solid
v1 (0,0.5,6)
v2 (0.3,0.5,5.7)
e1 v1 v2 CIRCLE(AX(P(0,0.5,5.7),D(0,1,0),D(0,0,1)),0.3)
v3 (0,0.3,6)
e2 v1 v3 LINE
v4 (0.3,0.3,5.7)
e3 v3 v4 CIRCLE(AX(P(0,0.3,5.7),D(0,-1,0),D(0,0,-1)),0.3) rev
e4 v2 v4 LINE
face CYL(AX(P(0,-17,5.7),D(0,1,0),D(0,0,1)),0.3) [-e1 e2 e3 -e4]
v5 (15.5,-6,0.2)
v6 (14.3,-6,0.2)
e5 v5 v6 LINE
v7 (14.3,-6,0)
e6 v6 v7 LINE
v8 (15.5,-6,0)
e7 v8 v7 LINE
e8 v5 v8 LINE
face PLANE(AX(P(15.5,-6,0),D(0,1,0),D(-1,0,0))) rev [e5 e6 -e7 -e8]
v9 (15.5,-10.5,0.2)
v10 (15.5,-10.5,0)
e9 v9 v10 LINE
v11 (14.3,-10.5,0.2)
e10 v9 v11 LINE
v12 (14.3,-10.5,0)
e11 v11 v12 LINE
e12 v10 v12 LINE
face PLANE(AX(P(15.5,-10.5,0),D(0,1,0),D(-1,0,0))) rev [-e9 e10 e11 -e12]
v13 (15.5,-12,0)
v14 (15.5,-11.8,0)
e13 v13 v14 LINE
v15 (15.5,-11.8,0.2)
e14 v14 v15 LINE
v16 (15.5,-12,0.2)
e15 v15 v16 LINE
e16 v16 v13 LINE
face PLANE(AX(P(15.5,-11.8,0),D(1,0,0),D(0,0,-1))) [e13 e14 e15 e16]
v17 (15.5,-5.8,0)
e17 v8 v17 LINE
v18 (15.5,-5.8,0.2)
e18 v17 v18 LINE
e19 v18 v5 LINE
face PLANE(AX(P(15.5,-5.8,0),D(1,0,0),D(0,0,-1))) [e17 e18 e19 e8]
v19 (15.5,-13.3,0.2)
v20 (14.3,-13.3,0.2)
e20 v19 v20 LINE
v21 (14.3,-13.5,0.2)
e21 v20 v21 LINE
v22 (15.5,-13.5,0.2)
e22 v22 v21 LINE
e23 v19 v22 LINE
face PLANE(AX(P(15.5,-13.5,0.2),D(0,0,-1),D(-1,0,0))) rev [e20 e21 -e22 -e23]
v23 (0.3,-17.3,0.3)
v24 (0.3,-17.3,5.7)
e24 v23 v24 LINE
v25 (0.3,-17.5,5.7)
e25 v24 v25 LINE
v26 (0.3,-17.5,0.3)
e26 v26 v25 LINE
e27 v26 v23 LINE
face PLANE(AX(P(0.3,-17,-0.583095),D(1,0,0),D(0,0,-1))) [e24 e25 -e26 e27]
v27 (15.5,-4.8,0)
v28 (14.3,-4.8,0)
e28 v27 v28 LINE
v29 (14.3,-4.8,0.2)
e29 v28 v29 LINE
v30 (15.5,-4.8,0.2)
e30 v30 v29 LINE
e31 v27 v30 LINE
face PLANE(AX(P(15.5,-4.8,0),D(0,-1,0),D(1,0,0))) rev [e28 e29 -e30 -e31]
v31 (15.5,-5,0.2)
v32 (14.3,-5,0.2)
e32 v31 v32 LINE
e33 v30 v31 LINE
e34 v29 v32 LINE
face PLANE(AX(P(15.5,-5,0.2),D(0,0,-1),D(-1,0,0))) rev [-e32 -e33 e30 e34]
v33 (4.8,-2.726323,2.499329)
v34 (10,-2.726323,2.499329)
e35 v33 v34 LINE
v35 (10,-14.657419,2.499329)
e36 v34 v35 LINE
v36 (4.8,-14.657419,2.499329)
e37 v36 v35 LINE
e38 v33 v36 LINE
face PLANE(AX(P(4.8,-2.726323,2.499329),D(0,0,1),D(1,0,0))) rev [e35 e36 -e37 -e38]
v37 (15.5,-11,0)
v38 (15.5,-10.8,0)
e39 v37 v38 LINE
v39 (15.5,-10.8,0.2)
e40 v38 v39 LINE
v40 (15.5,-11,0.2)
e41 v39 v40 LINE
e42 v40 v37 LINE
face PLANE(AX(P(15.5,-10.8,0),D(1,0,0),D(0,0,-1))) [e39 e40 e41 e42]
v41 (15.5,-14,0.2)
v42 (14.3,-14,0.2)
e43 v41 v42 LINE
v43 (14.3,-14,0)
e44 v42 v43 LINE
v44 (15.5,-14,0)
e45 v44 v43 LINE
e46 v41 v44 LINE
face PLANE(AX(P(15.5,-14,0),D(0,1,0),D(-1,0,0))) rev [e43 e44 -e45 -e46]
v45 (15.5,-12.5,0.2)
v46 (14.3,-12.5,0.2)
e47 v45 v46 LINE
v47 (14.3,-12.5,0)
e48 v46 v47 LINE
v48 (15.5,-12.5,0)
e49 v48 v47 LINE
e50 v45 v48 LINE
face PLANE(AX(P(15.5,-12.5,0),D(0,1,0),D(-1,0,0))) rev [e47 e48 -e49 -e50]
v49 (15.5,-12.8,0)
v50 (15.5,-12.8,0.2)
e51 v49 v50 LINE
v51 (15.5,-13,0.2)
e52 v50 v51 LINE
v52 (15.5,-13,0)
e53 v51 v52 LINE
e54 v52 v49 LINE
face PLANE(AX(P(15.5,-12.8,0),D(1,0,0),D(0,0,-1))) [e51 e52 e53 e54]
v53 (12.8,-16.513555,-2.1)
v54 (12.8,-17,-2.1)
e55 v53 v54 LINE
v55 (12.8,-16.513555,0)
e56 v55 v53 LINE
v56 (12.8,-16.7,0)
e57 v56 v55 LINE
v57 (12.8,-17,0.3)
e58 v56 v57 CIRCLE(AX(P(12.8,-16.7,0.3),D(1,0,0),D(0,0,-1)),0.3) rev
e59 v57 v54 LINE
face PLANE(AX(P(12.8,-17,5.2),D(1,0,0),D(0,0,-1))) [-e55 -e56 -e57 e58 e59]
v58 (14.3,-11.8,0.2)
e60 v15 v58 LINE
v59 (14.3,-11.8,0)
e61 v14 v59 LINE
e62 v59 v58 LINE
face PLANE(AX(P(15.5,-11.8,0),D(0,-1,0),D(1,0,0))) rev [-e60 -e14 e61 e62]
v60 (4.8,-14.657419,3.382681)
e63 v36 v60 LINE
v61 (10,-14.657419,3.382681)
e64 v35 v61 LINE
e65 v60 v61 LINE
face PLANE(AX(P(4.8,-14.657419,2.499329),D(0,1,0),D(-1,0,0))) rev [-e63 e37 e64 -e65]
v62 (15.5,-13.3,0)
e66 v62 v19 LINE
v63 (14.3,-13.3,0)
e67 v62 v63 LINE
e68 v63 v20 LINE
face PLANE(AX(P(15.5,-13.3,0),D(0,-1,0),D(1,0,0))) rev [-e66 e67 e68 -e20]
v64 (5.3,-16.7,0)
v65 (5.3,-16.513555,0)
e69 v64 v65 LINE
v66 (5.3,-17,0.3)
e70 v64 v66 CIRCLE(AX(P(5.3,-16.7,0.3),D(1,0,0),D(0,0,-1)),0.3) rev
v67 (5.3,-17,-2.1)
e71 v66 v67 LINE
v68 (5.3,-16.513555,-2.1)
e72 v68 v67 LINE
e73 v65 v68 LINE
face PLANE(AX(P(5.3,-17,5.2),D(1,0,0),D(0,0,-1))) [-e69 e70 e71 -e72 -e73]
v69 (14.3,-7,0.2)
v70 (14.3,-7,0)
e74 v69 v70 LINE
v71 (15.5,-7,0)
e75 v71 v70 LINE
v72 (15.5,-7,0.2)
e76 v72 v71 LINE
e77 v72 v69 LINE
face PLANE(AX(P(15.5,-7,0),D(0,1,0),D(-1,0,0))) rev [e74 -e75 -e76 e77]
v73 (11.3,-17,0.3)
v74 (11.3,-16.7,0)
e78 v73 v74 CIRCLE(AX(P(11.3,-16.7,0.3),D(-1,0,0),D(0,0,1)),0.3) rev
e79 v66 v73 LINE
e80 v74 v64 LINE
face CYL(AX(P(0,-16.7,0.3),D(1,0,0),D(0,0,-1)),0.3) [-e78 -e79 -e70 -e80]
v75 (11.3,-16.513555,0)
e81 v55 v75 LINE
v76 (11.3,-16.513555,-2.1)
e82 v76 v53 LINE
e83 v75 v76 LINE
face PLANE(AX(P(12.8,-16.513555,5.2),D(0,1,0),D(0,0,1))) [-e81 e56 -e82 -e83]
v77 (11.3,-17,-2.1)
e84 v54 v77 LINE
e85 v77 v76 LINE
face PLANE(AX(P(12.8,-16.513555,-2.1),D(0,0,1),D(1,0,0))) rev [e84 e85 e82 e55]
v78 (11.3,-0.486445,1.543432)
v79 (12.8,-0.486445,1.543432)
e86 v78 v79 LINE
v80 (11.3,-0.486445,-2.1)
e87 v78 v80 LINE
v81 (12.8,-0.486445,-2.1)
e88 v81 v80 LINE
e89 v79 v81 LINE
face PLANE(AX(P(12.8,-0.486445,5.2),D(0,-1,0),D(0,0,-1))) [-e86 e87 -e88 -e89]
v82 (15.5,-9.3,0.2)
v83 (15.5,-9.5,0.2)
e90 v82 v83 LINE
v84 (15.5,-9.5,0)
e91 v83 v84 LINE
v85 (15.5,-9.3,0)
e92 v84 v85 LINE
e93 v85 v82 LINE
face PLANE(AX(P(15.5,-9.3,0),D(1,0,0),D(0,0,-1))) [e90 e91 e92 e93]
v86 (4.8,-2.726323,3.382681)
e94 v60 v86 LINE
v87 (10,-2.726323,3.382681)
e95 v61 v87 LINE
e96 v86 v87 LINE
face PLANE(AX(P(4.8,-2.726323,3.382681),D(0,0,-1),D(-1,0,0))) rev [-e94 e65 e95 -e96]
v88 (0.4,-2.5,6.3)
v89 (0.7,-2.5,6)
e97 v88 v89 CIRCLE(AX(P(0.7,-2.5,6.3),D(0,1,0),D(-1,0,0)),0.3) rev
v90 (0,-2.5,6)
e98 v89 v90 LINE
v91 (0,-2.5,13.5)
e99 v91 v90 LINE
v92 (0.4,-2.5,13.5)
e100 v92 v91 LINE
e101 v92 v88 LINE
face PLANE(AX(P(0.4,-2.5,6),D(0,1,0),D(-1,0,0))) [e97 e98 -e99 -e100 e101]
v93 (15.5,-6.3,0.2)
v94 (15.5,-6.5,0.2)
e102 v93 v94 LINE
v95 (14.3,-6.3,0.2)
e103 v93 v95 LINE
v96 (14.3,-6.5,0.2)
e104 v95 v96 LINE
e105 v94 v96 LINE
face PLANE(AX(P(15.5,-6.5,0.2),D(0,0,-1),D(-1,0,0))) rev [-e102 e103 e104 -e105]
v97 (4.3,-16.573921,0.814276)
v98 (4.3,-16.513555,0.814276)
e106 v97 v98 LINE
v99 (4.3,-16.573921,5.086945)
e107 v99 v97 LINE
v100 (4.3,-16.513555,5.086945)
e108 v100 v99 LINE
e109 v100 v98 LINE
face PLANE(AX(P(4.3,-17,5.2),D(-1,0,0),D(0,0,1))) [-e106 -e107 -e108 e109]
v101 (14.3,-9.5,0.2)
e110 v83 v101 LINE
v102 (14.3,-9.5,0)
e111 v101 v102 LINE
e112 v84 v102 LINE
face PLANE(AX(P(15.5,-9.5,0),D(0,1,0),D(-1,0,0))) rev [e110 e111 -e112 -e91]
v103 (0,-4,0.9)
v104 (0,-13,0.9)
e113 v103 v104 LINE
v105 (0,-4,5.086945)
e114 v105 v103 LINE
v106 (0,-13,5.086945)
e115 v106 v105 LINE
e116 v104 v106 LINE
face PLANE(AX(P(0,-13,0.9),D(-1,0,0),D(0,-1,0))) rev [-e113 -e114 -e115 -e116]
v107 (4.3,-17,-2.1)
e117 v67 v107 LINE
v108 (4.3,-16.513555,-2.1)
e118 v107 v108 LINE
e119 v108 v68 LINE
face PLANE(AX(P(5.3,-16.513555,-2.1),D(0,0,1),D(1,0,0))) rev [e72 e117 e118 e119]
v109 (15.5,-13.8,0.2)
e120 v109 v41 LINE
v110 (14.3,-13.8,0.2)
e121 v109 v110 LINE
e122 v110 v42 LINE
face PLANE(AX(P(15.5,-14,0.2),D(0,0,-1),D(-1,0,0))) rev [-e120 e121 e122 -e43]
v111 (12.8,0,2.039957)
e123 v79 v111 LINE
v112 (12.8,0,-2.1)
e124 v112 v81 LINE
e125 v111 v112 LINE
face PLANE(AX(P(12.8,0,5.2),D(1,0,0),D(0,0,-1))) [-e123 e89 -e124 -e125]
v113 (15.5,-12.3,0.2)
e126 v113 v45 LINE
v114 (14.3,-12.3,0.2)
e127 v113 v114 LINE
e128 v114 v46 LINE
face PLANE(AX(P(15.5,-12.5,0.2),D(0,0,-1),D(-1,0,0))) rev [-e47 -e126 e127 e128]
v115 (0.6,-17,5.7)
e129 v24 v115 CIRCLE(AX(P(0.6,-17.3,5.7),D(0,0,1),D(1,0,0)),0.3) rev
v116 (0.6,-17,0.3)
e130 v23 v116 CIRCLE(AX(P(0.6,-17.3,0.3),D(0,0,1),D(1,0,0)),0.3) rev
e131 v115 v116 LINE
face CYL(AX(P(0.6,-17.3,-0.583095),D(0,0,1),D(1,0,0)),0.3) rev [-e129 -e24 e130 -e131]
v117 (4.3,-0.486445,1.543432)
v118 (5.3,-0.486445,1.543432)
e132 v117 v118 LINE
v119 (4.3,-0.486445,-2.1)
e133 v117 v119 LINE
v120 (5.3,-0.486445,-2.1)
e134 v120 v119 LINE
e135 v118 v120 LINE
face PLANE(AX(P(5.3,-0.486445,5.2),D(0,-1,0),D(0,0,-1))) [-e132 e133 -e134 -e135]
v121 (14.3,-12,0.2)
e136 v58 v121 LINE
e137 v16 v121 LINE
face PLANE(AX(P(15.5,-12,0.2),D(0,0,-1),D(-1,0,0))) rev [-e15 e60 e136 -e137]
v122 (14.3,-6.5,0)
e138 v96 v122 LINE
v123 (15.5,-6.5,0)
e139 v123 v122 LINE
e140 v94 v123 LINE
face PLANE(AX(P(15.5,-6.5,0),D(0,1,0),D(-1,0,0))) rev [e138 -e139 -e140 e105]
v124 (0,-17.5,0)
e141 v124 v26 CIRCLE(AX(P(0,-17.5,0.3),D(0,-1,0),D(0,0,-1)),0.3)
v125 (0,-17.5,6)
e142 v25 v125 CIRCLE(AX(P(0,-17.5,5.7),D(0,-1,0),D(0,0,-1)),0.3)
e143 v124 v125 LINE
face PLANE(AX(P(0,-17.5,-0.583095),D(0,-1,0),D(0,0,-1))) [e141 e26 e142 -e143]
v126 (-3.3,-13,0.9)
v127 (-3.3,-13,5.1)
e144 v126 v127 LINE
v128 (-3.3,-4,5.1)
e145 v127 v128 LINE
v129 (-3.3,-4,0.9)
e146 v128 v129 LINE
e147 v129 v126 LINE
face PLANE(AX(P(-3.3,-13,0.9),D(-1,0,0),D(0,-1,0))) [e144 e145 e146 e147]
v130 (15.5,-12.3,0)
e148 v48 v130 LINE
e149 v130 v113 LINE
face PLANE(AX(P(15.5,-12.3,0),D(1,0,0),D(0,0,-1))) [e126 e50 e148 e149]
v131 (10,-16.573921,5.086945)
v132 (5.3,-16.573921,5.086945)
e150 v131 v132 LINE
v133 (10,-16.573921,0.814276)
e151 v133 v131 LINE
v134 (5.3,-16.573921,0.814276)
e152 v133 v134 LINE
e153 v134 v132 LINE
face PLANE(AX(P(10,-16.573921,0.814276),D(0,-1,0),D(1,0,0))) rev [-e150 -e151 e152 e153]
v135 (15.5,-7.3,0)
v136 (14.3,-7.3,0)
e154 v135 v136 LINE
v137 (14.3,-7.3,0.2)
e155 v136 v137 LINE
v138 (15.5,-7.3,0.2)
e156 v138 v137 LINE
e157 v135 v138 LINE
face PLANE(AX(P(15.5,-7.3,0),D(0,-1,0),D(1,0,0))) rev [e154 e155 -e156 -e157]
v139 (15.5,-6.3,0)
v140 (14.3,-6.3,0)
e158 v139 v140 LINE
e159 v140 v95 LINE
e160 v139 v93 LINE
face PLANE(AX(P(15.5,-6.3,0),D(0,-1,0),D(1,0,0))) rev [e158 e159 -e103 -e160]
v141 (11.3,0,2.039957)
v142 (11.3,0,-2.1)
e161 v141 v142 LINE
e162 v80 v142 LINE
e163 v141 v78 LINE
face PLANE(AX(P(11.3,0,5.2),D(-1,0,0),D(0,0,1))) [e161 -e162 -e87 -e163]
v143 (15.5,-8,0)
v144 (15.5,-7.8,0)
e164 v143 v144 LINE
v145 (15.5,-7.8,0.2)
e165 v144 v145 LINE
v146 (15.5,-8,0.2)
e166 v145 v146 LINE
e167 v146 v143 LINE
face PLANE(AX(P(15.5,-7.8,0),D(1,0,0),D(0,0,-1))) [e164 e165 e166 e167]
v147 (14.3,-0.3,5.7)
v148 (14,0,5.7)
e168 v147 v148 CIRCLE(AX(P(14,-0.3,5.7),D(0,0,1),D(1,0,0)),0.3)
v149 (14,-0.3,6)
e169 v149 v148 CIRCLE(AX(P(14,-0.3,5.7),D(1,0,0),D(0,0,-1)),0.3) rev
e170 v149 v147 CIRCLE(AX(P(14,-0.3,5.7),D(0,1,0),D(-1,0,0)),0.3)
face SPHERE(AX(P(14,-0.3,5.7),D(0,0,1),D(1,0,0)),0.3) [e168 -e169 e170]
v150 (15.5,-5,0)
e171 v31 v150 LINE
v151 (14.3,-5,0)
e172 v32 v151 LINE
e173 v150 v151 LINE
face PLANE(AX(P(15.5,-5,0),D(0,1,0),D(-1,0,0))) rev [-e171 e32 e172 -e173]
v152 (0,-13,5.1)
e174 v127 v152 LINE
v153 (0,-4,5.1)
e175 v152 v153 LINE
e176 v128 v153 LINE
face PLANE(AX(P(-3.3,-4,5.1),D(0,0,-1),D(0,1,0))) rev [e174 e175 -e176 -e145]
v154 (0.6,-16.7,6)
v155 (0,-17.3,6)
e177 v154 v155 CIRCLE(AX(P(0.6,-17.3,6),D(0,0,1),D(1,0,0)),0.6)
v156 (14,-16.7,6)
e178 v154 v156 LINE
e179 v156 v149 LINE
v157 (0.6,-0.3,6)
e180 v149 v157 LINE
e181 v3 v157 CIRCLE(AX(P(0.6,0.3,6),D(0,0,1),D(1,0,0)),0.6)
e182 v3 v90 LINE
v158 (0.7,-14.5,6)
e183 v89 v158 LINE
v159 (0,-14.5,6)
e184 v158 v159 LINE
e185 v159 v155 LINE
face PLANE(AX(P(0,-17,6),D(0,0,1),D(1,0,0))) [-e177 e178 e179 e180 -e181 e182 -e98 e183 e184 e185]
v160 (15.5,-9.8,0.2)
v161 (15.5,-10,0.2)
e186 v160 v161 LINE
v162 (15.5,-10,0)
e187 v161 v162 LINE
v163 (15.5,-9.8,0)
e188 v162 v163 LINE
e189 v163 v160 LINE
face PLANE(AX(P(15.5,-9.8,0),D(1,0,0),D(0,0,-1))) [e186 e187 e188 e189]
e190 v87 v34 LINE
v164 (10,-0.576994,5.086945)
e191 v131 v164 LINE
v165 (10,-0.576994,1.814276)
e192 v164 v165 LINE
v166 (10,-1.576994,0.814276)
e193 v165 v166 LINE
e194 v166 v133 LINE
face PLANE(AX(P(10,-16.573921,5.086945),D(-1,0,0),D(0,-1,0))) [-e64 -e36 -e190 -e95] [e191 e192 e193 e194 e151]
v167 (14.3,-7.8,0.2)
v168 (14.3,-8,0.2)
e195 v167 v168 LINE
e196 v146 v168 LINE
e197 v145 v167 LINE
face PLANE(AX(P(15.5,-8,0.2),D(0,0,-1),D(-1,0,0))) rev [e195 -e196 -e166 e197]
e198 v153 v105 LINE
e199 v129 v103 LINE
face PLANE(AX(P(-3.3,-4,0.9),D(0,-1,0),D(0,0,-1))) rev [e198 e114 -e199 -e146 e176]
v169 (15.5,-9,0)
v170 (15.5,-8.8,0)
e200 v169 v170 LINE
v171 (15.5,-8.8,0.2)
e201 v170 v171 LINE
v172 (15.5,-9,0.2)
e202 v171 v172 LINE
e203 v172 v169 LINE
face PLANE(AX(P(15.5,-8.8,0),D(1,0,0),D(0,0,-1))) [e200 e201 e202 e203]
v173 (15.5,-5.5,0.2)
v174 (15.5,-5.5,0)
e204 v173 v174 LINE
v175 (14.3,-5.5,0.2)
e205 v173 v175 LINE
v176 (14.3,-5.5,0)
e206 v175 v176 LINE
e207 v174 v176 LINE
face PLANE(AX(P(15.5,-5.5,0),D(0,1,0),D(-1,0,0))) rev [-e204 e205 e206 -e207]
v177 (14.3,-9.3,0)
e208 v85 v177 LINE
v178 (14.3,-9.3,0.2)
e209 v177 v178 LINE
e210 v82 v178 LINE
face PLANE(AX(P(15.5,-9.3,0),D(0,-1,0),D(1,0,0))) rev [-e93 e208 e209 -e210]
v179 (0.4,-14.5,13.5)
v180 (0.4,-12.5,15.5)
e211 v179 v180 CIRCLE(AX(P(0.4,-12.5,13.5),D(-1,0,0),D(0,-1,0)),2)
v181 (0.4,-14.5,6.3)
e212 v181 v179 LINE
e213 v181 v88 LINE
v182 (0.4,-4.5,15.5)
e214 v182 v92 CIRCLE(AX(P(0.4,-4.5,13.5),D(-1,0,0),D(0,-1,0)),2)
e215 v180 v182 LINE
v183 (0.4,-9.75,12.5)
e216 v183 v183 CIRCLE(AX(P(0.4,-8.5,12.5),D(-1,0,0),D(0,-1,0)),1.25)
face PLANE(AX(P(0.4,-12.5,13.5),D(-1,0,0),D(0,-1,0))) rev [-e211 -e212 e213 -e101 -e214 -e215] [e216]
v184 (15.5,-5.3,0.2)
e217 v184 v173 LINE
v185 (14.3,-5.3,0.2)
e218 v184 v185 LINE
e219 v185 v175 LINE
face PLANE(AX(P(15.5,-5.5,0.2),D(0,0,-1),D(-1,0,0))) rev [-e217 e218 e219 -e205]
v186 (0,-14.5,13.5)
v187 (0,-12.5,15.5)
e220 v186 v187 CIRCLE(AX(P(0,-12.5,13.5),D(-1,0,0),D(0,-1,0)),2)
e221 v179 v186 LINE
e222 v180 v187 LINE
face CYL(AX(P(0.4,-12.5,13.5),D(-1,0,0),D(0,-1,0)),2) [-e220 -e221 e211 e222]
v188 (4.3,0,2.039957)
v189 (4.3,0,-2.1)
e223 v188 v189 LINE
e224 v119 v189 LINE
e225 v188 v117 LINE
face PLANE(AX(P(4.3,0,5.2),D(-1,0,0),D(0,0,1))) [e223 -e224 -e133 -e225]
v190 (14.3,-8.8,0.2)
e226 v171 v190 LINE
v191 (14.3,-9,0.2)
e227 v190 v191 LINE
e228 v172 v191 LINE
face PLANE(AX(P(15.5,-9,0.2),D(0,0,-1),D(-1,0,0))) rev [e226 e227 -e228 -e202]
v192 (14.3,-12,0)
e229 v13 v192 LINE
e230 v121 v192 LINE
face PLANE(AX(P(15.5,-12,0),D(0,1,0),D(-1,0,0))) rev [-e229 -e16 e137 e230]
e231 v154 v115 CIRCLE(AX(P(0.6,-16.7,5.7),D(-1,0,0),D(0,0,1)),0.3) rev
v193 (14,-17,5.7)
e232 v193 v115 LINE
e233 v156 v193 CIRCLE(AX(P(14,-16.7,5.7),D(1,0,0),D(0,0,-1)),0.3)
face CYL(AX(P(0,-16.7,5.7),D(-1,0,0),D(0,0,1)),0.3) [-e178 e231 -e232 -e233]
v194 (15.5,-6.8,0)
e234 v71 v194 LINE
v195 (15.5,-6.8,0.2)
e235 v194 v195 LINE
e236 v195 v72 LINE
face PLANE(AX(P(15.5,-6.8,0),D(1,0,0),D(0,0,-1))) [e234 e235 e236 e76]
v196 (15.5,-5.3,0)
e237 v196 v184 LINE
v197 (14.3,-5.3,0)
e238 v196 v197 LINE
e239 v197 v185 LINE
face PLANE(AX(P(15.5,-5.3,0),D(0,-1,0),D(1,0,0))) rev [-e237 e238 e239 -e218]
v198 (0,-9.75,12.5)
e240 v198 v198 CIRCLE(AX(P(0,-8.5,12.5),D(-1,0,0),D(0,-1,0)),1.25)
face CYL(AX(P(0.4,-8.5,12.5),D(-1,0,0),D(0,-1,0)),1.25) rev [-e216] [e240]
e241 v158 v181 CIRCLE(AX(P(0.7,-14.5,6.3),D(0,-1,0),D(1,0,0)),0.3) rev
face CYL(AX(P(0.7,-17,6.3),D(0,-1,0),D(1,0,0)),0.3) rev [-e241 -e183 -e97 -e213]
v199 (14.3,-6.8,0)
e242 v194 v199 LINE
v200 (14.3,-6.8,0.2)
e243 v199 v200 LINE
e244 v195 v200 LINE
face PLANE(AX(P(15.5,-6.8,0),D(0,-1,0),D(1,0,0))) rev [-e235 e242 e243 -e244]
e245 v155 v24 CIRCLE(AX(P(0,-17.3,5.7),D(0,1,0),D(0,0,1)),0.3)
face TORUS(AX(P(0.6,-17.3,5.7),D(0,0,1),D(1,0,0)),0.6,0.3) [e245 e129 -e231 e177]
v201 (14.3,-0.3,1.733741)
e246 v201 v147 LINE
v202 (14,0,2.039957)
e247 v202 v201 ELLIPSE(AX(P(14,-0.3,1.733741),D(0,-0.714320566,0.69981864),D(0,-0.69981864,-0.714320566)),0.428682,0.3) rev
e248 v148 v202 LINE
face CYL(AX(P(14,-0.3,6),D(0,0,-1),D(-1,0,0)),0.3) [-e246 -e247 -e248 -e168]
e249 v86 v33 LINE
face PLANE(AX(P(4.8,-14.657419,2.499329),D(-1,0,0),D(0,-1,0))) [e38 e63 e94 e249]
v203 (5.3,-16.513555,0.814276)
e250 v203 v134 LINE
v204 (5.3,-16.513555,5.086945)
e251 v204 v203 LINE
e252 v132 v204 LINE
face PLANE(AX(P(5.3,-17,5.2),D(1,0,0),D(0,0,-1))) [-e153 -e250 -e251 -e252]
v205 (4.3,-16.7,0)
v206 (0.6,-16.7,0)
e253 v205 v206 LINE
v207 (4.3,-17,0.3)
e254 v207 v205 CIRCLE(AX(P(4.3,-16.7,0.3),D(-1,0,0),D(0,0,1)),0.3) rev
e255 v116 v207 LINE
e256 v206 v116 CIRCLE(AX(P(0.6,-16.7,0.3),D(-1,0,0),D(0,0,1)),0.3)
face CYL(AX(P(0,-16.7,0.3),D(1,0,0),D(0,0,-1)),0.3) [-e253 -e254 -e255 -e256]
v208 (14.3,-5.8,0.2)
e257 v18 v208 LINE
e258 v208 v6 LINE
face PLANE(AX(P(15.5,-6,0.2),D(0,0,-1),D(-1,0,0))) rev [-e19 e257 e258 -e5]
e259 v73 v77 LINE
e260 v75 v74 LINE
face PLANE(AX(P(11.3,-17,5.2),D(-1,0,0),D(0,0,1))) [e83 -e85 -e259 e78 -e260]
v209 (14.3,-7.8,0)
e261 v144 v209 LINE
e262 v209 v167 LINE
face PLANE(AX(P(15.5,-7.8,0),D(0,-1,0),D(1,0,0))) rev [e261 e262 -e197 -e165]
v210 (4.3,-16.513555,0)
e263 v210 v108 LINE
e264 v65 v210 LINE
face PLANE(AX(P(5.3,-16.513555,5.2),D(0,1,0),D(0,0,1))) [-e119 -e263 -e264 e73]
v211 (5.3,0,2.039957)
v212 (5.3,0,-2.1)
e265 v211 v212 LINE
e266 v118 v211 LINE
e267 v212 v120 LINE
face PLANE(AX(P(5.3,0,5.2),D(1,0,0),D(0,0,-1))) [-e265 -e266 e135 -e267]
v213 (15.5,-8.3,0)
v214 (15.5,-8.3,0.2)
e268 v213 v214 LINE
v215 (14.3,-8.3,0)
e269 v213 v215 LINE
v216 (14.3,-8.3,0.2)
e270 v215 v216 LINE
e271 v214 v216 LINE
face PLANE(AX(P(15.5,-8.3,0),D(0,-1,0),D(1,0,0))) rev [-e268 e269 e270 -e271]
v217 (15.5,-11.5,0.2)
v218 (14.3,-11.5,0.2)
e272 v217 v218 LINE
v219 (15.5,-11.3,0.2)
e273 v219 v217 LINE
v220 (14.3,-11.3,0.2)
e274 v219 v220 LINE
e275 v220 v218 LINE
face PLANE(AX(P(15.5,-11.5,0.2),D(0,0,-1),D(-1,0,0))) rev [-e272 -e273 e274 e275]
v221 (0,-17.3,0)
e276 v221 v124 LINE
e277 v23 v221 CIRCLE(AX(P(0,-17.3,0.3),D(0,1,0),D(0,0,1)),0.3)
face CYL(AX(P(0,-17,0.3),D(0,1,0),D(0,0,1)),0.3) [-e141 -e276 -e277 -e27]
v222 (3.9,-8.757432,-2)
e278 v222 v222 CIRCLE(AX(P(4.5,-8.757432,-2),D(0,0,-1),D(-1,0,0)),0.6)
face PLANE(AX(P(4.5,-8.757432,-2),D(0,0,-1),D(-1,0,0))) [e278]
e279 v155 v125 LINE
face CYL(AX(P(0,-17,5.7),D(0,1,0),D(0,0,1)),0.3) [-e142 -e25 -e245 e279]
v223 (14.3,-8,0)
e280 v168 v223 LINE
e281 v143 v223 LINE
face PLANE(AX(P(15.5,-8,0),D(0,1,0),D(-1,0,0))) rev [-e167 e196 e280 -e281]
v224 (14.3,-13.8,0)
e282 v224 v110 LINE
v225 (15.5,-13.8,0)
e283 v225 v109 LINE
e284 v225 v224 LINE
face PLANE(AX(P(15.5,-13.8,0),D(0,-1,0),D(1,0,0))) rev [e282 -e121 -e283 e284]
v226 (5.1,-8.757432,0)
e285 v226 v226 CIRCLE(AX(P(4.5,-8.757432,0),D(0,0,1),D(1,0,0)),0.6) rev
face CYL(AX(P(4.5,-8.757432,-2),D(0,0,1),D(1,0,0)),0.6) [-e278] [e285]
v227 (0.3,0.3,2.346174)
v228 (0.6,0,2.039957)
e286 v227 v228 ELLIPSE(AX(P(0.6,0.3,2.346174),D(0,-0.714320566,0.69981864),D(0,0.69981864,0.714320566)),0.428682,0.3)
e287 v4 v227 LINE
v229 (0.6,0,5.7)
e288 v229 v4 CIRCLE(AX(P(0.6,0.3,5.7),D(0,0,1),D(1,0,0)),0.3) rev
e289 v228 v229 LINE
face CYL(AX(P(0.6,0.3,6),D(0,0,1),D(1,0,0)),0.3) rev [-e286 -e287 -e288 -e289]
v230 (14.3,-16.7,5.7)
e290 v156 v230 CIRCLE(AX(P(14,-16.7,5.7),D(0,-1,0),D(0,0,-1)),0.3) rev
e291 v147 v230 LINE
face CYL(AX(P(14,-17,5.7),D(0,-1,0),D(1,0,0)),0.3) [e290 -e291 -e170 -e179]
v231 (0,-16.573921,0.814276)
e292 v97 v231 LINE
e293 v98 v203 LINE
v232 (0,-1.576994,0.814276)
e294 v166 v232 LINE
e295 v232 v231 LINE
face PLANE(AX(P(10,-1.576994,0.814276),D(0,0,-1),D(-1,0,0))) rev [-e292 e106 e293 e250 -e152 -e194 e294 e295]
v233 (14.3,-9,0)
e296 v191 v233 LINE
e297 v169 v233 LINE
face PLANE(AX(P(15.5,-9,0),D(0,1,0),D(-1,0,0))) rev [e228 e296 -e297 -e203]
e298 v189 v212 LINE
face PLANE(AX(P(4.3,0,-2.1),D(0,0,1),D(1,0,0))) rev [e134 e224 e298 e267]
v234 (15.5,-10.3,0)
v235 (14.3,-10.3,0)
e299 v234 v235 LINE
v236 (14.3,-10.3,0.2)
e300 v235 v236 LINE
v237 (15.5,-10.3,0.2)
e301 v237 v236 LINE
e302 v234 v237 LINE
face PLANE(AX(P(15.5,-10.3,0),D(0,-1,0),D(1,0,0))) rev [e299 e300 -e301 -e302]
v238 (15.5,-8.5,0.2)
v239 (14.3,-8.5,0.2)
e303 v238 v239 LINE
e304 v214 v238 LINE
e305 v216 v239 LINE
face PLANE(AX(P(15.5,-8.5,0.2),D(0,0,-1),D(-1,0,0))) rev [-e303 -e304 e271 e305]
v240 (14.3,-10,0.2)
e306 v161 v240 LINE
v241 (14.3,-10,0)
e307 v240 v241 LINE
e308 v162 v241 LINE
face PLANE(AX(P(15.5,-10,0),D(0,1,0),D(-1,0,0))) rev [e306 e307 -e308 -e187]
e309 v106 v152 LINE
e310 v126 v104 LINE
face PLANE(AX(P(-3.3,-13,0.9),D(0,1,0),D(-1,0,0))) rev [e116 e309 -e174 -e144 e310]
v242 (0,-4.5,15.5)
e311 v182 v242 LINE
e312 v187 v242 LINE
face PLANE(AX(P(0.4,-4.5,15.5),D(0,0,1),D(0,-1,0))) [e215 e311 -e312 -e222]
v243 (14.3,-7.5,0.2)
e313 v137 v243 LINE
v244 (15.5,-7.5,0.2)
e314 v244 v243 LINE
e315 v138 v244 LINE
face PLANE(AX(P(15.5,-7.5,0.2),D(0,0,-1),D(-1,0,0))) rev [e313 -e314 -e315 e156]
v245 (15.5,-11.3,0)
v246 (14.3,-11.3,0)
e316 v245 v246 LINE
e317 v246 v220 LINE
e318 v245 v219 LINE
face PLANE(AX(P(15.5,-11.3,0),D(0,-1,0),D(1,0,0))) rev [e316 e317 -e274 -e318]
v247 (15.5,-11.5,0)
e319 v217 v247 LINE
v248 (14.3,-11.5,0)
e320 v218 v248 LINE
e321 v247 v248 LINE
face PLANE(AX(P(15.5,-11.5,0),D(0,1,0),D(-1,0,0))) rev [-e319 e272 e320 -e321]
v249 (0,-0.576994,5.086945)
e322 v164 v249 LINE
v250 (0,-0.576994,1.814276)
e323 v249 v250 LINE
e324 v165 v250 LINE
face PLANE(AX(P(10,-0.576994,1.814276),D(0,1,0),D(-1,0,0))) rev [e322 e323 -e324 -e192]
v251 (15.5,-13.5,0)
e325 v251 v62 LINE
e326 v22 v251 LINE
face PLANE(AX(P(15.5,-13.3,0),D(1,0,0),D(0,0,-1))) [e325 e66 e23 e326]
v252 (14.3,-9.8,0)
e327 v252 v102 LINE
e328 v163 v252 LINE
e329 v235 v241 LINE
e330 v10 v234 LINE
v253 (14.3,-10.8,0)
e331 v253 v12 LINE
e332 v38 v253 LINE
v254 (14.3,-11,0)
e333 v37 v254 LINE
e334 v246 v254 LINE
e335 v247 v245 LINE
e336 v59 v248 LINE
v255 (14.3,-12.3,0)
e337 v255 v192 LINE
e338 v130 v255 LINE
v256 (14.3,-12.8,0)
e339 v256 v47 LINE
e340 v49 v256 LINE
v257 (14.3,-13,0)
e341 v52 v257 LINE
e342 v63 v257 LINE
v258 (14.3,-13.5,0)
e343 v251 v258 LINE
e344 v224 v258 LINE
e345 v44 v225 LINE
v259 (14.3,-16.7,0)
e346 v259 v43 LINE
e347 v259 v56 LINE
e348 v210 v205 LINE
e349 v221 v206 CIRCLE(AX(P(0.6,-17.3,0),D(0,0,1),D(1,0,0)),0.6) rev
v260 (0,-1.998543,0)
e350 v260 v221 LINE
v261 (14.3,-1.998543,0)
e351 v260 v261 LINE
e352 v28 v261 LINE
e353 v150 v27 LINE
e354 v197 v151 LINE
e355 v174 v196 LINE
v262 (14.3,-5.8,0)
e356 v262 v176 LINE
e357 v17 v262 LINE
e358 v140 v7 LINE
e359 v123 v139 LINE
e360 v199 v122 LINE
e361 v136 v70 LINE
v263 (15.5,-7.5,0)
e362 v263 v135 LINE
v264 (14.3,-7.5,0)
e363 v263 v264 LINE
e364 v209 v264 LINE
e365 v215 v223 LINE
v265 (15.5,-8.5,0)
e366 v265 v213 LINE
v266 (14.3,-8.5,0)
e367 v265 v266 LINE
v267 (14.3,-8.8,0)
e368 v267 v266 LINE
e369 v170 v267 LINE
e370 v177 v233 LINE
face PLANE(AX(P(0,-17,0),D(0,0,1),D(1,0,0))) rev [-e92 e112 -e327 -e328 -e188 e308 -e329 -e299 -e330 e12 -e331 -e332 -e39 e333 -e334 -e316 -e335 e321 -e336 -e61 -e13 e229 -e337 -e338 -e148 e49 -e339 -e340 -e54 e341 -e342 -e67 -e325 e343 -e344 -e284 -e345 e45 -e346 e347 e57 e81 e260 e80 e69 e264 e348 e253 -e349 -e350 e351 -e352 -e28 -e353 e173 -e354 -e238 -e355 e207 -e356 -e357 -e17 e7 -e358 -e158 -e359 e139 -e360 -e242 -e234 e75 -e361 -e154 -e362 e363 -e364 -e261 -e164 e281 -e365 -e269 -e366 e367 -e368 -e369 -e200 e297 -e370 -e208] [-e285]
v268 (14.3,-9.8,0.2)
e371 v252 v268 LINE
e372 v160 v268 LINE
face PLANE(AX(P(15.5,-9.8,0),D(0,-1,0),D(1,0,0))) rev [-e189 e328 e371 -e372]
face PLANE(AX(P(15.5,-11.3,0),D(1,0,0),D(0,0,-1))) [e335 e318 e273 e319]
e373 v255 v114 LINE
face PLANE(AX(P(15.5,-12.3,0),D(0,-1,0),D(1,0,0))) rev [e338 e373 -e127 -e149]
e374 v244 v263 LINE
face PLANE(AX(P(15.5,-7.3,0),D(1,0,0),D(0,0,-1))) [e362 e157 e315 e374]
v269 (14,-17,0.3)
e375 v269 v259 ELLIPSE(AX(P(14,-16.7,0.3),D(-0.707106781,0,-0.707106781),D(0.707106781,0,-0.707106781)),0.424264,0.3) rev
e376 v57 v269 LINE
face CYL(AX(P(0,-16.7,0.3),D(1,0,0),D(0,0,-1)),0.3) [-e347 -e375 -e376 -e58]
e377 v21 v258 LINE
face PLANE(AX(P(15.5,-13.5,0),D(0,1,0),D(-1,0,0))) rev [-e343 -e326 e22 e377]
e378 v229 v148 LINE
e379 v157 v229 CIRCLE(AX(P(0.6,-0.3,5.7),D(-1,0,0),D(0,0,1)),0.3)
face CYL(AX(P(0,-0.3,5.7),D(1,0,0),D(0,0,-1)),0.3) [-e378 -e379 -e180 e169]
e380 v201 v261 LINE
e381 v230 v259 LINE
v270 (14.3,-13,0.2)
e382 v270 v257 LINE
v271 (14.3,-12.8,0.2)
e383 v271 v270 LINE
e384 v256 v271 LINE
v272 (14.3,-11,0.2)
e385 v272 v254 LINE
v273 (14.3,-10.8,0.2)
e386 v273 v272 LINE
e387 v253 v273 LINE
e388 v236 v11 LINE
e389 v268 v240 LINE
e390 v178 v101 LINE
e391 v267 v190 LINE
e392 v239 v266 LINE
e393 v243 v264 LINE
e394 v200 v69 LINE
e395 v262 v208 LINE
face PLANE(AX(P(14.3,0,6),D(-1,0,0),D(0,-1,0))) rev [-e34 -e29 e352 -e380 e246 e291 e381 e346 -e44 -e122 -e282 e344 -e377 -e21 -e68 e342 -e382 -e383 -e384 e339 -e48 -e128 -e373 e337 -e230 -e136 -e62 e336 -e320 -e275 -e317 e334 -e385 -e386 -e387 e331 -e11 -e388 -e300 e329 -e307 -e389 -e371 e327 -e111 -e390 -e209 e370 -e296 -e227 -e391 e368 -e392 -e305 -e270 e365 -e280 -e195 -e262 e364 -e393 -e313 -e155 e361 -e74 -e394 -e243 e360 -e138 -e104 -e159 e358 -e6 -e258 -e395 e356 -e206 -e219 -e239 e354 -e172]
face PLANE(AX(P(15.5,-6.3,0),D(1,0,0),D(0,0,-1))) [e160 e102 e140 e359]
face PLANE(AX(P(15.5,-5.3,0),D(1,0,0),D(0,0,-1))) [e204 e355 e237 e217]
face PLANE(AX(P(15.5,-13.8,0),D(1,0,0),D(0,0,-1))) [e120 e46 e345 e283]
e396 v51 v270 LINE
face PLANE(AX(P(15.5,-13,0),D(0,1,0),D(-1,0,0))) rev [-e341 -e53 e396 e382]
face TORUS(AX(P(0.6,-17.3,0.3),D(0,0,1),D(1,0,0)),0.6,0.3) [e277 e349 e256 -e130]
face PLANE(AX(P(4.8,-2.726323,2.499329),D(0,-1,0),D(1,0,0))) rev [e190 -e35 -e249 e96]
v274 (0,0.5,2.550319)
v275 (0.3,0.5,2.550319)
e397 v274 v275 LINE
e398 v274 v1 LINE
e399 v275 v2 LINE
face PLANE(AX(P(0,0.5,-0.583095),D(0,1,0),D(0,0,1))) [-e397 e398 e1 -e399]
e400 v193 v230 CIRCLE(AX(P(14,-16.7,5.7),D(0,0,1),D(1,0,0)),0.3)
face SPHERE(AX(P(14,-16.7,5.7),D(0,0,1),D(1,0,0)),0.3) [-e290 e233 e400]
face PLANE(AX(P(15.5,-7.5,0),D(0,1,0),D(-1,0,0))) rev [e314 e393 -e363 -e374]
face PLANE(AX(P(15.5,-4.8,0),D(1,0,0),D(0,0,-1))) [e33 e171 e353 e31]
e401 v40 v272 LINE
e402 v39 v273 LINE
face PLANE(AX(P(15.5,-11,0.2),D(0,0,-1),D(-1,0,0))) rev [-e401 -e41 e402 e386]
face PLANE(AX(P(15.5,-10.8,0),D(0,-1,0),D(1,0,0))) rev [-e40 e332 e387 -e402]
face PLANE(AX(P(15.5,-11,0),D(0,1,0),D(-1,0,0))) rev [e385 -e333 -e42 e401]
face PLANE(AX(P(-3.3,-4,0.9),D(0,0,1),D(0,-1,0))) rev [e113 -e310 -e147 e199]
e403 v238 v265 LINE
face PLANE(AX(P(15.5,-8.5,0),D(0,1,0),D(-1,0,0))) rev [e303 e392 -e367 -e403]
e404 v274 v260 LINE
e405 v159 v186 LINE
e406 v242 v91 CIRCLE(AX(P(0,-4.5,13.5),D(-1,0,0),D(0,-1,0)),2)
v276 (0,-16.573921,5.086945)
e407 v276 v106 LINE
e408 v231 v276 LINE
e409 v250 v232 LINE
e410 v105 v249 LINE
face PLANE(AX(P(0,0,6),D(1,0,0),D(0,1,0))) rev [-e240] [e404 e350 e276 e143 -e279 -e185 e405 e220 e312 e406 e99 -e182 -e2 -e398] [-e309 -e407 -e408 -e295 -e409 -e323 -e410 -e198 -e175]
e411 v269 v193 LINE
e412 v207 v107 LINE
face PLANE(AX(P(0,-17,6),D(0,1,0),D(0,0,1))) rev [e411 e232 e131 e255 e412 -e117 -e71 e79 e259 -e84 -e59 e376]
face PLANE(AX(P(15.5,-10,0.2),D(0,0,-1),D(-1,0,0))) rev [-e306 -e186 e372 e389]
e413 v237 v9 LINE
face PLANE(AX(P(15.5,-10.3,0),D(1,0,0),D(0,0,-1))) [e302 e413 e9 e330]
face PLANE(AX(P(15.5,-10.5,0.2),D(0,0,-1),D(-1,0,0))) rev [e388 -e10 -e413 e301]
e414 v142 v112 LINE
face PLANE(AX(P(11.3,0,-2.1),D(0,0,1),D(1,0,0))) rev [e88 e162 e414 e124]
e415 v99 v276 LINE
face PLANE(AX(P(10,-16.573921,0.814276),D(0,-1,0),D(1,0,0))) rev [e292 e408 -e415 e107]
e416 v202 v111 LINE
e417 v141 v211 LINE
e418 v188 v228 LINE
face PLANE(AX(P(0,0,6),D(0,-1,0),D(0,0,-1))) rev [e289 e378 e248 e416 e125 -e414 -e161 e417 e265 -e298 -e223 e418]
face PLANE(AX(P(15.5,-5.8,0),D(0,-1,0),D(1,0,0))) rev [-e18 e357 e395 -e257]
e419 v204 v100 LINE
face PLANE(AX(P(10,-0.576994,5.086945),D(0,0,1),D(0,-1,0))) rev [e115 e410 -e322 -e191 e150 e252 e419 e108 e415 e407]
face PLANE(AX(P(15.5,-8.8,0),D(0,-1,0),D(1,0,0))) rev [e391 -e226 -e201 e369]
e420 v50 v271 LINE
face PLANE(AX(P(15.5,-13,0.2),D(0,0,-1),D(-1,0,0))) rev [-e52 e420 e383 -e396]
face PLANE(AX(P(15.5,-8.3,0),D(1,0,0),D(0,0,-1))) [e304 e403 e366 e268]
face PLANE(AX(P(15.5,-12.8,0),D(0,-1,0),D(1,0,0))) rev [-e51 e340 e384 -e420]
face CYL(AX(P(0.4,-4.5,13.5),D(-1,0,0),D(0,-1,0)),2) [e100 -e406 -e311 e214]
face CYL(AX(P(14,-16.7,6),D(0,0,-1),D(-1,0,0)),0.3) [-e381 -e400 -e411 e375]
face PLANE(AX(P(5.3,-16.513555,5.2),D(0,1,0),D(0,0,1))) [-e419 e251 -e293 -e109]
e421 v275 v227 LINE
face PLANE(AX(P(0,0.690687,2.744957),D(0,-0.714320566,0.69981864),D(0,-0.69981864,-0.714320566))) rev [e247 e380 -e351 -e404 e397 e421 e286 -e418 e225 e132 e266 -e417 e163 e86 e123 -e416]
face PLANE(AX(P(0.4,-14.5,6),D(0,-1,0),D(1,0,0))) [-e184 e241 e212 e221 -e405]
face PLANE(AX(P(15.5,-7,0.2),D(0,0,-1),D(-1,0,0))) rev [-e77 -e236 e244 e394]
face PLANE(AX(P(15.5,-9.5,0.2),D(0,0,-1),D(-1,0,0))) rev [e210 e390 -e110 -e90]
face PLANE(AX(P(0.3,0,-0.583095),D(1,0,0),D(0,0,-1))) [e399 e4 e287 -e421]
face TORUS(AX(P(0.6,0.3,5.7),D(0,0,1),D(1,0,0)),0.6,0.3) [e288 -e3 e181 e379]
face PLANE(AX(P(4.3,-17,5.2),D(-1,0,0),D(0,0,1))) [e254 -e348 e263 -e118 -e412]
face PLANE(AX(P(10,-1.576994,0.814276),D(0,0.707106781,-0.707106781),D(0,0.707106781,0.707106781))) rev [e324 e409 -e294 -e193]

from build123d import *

# Parameters (mm, degrees)
SKETCH_1_W             = 14.3
SKETCH_1_H             = 17
EXTRUDE_1_DEPTH        = 6
SKETCH_3_W             = 0.2
SKETCH_3_H             = 0.2
EXTRUDE_3_DEPTH        = 1.2
PATTERN_LINEAR_1_COUNT = 19
PATTERN_LINEAR_1_PITCH = 0.5
SKETCH_4_W             = 0.3
SKETCH_4_H             = 0.5
EXTRUDE_4_DEPTH        = 6
CUT_EXTRUDE_1_DEPTH    = 10
SKETCH_8_W             = 0.883352336
SKETCH_8_H             = 11.931096145
EXTRUDE_6_DEPTH        = 5.2
CUT_EXTRUDE_4_DEPTH    = 24.382472068
EXTRUDE_7_DEPTH        = 2.1
EXTRUDE_7_DEPTH_BACK   = 5.2
SKETCH_12_W            = 1.5
SKETCH_12_H            = 0.486445161
SKETCH_12_W_2          = 1
SKETCH_13_R            = 0.6
EXTRUDE_8_DEPTH        = 2
SKETCH_15_R            = 1.25
EXTRUDE_9_DEPTH        = 0.4
SKETCH_16_W            = 4.2
SKETCH_16_H            = 9
EXTRUDE_10_DEPTH       = 3.3
FILLET_1_R             = 0.3


with BuildPart() as part:
    # 草图1 → 凸台-拉伸1 (new body)
    with BuildSketch(Plane.XY):
        with Locations((7.15, -8.5)):
            Rectangle(SKETCH_1_W, SKETCH_1_H)
    extrude(amount=EXTRUDE_1_DEPTH)

    # 草图3 → 凸台-拉伸3 (add)
    with BuildSketch(Plane(origin=(14.3, 0, 0), x_dir=(0, 0, -1), z_dir=(1, 0, 0))):
        with Locations((-0.1, -13.9)):
            Rectangle(SKETCH_3_W, SKETCH_3_H)
    extrude_3 = extrude(amount=EXTRUDE_3_DEPTH)

    # 阵列(线性)1: 凸台-拉伸3 ×19
    with Locations(*[(0, i * PATTERN_LINEAR_1_PITCH, 0) for i in range(1, PATTERN_LINEAR_1_COUNT)]):
        add(extrude_3)

    # 草图4 → 凸台-拉伸4 (add)
    with BuildSketch(Plane.XY.offset(6)):
        with Locations((0.15, 0.25)):
            Rectangle(SKETCH_4_W, SKETCH_4_H)
        with Locations((0.15, -17.25)):
            Rectangle(SKETCH_4_W, SKETCH_4_H)
    extrude(amount=-EXTRUDE_4_DEPTH)

    # 草图6 → 切除-拉伸1 (cut)
    with BuildSketch(Plane.ZY):
        Polygon((0.814275945, -1.576993803), (1.814275945, -0.576993803), (5.086945076, -0.576993803), (5.086945076, -16.573920601), (0.814275945, -16.573920601), align=None)
    extrude(amount=-CUT_EXTRUDE_1_DEPTH, mode=Mode.SUBTRACT)

    # 草图8 → 凸台-拉伸6 (add)
    with BuildSketch(Plane.ZY.offset(-10)):
        with Locations((2.941004683, -8.691870864)):
            Rectangle(SKETCH_8_W, SKETCH_8_H)
    extrude(amount=EXTRUDE_6_DEPTH)

    # 草图11 → 切除-拉伸4 (cut, through all)
    with BuildSketch(Plane(origin=(14.3, 0, 0), x_dir=(0, 0, -1), z_dir=(1, 0, 0))):
        Polygon((-2.744957318, 0.690687189), (0.440532754, -2.430132002), (0.440532754, 0.690687189), align=None)
    extrude(amount=-CUT_EXTRUDE_4_DEPTH, mode=Mode.SUBTRACT)

    # 草图12 → 凸台-拉伸7 (add, two sides: drawn at the far end of the back side and taken through both)
    with BuildSketch(Plane(origin=(0, 0, 0), x_dir=(-1, 0, 0), z_dir=(0, 0, -1)).offset(-EXTRUDE_7_DEPTH_BACK)):
        with Locations((-12.05, -16.75677742)):
            Rectangle(SKETCH_12_W, SKETCH_12_H)
        with Locations((-4.8, -16.75677742)):
            Rectangle(SKETCH_12_W_2, SKETCH_12_H)
        with Locations((-4.8, -0.243222581)):
            Rectangle(SKETCH_12_W_2, SKETCH_12_H)
        with Locations((-12.05, -0.243222581)):
            Rectangle(SKETCH_12_W, SKETCH_12_H)
    extrude(amount=EXTRUDE_7_DEPTH + EXTRUDE_7_DEPTH_BACK)

    # 草图13 → 凸台-拉伸8 (add)
    with BuildSketch(Plane(origin=(0, 0, 0), x_dir=(-1, 0, 0), z_dir=(0, 0, -1))):
        with Locations(Location((-4.5, -8.757432115, 0), (0, 0, 180))):
            Circle(SKETCH_13_R)
    extrude(amount=EXTRUDE_8_DEPTH)

    # 草图15 → 凸台-拉伸9 (add)
    with BuildSketch(Plane.ZY):
        with BuildLine():
            Line((6, -2.5), (13.5, -2.5))
            ThreePointArc((13.5, -2.5), (14.914213562, -3.085786438), (15.5, -4.5))
            Line((15.5, -4.5), (15.5, -12.5))
            ThreePointArc((15.5, -12.5), (14.914213562, -13.914213562), (13.5, -14.5))
            Line((13.5, -14.5), (6, -14.5))
            Line((6, -14.5), (6, -2.5))
        make_face()
        with Locations(Location((12.5, -8.5, 0), (0, 0, 270))):
            Circle(SKETCH_15_R, mode=Mode.SUBTRACT)
    extrude(amount=-EXTRUDE_9_DEPTH)

    # 草图16 → 凸台-拉伸10 (add)
    with BuildSketch(Plane.ZY):
        with Locations((3, -8.5)):
            Rectangle(SKETCH_16_W, SKETCH_16_H)
    extrude(amount=EXTRUDE_10_DEPTH)

    # 圆角1
    fillet_1_edges = [part.edges().sort_by_distance(p)[0] for p in [
        (0.3, 0.25, 6),
        (0.3, -17.25, 0),
        (0.3, -17.25, 6),
        (0.3, 0, 4.019978715),
        (0.4, -8.5, 6),
        (0.3, -17, 3),
        (2.3, -17, 0),
        (8.3, -17, 0),
        (13.55, -17, 0),
        (14.3, -17, 3),
        (7.3, -17, 6),
        (14.3, 0, 4.019978715),
        (14.3, -8.5, 6),
        (7.3, 0, 6),
    ]]
    fillet(fillet_1_edges, radius=FILLET_1_R - 0.0001)  # a hair under: the kernel refuses the full size


solid = part.part
